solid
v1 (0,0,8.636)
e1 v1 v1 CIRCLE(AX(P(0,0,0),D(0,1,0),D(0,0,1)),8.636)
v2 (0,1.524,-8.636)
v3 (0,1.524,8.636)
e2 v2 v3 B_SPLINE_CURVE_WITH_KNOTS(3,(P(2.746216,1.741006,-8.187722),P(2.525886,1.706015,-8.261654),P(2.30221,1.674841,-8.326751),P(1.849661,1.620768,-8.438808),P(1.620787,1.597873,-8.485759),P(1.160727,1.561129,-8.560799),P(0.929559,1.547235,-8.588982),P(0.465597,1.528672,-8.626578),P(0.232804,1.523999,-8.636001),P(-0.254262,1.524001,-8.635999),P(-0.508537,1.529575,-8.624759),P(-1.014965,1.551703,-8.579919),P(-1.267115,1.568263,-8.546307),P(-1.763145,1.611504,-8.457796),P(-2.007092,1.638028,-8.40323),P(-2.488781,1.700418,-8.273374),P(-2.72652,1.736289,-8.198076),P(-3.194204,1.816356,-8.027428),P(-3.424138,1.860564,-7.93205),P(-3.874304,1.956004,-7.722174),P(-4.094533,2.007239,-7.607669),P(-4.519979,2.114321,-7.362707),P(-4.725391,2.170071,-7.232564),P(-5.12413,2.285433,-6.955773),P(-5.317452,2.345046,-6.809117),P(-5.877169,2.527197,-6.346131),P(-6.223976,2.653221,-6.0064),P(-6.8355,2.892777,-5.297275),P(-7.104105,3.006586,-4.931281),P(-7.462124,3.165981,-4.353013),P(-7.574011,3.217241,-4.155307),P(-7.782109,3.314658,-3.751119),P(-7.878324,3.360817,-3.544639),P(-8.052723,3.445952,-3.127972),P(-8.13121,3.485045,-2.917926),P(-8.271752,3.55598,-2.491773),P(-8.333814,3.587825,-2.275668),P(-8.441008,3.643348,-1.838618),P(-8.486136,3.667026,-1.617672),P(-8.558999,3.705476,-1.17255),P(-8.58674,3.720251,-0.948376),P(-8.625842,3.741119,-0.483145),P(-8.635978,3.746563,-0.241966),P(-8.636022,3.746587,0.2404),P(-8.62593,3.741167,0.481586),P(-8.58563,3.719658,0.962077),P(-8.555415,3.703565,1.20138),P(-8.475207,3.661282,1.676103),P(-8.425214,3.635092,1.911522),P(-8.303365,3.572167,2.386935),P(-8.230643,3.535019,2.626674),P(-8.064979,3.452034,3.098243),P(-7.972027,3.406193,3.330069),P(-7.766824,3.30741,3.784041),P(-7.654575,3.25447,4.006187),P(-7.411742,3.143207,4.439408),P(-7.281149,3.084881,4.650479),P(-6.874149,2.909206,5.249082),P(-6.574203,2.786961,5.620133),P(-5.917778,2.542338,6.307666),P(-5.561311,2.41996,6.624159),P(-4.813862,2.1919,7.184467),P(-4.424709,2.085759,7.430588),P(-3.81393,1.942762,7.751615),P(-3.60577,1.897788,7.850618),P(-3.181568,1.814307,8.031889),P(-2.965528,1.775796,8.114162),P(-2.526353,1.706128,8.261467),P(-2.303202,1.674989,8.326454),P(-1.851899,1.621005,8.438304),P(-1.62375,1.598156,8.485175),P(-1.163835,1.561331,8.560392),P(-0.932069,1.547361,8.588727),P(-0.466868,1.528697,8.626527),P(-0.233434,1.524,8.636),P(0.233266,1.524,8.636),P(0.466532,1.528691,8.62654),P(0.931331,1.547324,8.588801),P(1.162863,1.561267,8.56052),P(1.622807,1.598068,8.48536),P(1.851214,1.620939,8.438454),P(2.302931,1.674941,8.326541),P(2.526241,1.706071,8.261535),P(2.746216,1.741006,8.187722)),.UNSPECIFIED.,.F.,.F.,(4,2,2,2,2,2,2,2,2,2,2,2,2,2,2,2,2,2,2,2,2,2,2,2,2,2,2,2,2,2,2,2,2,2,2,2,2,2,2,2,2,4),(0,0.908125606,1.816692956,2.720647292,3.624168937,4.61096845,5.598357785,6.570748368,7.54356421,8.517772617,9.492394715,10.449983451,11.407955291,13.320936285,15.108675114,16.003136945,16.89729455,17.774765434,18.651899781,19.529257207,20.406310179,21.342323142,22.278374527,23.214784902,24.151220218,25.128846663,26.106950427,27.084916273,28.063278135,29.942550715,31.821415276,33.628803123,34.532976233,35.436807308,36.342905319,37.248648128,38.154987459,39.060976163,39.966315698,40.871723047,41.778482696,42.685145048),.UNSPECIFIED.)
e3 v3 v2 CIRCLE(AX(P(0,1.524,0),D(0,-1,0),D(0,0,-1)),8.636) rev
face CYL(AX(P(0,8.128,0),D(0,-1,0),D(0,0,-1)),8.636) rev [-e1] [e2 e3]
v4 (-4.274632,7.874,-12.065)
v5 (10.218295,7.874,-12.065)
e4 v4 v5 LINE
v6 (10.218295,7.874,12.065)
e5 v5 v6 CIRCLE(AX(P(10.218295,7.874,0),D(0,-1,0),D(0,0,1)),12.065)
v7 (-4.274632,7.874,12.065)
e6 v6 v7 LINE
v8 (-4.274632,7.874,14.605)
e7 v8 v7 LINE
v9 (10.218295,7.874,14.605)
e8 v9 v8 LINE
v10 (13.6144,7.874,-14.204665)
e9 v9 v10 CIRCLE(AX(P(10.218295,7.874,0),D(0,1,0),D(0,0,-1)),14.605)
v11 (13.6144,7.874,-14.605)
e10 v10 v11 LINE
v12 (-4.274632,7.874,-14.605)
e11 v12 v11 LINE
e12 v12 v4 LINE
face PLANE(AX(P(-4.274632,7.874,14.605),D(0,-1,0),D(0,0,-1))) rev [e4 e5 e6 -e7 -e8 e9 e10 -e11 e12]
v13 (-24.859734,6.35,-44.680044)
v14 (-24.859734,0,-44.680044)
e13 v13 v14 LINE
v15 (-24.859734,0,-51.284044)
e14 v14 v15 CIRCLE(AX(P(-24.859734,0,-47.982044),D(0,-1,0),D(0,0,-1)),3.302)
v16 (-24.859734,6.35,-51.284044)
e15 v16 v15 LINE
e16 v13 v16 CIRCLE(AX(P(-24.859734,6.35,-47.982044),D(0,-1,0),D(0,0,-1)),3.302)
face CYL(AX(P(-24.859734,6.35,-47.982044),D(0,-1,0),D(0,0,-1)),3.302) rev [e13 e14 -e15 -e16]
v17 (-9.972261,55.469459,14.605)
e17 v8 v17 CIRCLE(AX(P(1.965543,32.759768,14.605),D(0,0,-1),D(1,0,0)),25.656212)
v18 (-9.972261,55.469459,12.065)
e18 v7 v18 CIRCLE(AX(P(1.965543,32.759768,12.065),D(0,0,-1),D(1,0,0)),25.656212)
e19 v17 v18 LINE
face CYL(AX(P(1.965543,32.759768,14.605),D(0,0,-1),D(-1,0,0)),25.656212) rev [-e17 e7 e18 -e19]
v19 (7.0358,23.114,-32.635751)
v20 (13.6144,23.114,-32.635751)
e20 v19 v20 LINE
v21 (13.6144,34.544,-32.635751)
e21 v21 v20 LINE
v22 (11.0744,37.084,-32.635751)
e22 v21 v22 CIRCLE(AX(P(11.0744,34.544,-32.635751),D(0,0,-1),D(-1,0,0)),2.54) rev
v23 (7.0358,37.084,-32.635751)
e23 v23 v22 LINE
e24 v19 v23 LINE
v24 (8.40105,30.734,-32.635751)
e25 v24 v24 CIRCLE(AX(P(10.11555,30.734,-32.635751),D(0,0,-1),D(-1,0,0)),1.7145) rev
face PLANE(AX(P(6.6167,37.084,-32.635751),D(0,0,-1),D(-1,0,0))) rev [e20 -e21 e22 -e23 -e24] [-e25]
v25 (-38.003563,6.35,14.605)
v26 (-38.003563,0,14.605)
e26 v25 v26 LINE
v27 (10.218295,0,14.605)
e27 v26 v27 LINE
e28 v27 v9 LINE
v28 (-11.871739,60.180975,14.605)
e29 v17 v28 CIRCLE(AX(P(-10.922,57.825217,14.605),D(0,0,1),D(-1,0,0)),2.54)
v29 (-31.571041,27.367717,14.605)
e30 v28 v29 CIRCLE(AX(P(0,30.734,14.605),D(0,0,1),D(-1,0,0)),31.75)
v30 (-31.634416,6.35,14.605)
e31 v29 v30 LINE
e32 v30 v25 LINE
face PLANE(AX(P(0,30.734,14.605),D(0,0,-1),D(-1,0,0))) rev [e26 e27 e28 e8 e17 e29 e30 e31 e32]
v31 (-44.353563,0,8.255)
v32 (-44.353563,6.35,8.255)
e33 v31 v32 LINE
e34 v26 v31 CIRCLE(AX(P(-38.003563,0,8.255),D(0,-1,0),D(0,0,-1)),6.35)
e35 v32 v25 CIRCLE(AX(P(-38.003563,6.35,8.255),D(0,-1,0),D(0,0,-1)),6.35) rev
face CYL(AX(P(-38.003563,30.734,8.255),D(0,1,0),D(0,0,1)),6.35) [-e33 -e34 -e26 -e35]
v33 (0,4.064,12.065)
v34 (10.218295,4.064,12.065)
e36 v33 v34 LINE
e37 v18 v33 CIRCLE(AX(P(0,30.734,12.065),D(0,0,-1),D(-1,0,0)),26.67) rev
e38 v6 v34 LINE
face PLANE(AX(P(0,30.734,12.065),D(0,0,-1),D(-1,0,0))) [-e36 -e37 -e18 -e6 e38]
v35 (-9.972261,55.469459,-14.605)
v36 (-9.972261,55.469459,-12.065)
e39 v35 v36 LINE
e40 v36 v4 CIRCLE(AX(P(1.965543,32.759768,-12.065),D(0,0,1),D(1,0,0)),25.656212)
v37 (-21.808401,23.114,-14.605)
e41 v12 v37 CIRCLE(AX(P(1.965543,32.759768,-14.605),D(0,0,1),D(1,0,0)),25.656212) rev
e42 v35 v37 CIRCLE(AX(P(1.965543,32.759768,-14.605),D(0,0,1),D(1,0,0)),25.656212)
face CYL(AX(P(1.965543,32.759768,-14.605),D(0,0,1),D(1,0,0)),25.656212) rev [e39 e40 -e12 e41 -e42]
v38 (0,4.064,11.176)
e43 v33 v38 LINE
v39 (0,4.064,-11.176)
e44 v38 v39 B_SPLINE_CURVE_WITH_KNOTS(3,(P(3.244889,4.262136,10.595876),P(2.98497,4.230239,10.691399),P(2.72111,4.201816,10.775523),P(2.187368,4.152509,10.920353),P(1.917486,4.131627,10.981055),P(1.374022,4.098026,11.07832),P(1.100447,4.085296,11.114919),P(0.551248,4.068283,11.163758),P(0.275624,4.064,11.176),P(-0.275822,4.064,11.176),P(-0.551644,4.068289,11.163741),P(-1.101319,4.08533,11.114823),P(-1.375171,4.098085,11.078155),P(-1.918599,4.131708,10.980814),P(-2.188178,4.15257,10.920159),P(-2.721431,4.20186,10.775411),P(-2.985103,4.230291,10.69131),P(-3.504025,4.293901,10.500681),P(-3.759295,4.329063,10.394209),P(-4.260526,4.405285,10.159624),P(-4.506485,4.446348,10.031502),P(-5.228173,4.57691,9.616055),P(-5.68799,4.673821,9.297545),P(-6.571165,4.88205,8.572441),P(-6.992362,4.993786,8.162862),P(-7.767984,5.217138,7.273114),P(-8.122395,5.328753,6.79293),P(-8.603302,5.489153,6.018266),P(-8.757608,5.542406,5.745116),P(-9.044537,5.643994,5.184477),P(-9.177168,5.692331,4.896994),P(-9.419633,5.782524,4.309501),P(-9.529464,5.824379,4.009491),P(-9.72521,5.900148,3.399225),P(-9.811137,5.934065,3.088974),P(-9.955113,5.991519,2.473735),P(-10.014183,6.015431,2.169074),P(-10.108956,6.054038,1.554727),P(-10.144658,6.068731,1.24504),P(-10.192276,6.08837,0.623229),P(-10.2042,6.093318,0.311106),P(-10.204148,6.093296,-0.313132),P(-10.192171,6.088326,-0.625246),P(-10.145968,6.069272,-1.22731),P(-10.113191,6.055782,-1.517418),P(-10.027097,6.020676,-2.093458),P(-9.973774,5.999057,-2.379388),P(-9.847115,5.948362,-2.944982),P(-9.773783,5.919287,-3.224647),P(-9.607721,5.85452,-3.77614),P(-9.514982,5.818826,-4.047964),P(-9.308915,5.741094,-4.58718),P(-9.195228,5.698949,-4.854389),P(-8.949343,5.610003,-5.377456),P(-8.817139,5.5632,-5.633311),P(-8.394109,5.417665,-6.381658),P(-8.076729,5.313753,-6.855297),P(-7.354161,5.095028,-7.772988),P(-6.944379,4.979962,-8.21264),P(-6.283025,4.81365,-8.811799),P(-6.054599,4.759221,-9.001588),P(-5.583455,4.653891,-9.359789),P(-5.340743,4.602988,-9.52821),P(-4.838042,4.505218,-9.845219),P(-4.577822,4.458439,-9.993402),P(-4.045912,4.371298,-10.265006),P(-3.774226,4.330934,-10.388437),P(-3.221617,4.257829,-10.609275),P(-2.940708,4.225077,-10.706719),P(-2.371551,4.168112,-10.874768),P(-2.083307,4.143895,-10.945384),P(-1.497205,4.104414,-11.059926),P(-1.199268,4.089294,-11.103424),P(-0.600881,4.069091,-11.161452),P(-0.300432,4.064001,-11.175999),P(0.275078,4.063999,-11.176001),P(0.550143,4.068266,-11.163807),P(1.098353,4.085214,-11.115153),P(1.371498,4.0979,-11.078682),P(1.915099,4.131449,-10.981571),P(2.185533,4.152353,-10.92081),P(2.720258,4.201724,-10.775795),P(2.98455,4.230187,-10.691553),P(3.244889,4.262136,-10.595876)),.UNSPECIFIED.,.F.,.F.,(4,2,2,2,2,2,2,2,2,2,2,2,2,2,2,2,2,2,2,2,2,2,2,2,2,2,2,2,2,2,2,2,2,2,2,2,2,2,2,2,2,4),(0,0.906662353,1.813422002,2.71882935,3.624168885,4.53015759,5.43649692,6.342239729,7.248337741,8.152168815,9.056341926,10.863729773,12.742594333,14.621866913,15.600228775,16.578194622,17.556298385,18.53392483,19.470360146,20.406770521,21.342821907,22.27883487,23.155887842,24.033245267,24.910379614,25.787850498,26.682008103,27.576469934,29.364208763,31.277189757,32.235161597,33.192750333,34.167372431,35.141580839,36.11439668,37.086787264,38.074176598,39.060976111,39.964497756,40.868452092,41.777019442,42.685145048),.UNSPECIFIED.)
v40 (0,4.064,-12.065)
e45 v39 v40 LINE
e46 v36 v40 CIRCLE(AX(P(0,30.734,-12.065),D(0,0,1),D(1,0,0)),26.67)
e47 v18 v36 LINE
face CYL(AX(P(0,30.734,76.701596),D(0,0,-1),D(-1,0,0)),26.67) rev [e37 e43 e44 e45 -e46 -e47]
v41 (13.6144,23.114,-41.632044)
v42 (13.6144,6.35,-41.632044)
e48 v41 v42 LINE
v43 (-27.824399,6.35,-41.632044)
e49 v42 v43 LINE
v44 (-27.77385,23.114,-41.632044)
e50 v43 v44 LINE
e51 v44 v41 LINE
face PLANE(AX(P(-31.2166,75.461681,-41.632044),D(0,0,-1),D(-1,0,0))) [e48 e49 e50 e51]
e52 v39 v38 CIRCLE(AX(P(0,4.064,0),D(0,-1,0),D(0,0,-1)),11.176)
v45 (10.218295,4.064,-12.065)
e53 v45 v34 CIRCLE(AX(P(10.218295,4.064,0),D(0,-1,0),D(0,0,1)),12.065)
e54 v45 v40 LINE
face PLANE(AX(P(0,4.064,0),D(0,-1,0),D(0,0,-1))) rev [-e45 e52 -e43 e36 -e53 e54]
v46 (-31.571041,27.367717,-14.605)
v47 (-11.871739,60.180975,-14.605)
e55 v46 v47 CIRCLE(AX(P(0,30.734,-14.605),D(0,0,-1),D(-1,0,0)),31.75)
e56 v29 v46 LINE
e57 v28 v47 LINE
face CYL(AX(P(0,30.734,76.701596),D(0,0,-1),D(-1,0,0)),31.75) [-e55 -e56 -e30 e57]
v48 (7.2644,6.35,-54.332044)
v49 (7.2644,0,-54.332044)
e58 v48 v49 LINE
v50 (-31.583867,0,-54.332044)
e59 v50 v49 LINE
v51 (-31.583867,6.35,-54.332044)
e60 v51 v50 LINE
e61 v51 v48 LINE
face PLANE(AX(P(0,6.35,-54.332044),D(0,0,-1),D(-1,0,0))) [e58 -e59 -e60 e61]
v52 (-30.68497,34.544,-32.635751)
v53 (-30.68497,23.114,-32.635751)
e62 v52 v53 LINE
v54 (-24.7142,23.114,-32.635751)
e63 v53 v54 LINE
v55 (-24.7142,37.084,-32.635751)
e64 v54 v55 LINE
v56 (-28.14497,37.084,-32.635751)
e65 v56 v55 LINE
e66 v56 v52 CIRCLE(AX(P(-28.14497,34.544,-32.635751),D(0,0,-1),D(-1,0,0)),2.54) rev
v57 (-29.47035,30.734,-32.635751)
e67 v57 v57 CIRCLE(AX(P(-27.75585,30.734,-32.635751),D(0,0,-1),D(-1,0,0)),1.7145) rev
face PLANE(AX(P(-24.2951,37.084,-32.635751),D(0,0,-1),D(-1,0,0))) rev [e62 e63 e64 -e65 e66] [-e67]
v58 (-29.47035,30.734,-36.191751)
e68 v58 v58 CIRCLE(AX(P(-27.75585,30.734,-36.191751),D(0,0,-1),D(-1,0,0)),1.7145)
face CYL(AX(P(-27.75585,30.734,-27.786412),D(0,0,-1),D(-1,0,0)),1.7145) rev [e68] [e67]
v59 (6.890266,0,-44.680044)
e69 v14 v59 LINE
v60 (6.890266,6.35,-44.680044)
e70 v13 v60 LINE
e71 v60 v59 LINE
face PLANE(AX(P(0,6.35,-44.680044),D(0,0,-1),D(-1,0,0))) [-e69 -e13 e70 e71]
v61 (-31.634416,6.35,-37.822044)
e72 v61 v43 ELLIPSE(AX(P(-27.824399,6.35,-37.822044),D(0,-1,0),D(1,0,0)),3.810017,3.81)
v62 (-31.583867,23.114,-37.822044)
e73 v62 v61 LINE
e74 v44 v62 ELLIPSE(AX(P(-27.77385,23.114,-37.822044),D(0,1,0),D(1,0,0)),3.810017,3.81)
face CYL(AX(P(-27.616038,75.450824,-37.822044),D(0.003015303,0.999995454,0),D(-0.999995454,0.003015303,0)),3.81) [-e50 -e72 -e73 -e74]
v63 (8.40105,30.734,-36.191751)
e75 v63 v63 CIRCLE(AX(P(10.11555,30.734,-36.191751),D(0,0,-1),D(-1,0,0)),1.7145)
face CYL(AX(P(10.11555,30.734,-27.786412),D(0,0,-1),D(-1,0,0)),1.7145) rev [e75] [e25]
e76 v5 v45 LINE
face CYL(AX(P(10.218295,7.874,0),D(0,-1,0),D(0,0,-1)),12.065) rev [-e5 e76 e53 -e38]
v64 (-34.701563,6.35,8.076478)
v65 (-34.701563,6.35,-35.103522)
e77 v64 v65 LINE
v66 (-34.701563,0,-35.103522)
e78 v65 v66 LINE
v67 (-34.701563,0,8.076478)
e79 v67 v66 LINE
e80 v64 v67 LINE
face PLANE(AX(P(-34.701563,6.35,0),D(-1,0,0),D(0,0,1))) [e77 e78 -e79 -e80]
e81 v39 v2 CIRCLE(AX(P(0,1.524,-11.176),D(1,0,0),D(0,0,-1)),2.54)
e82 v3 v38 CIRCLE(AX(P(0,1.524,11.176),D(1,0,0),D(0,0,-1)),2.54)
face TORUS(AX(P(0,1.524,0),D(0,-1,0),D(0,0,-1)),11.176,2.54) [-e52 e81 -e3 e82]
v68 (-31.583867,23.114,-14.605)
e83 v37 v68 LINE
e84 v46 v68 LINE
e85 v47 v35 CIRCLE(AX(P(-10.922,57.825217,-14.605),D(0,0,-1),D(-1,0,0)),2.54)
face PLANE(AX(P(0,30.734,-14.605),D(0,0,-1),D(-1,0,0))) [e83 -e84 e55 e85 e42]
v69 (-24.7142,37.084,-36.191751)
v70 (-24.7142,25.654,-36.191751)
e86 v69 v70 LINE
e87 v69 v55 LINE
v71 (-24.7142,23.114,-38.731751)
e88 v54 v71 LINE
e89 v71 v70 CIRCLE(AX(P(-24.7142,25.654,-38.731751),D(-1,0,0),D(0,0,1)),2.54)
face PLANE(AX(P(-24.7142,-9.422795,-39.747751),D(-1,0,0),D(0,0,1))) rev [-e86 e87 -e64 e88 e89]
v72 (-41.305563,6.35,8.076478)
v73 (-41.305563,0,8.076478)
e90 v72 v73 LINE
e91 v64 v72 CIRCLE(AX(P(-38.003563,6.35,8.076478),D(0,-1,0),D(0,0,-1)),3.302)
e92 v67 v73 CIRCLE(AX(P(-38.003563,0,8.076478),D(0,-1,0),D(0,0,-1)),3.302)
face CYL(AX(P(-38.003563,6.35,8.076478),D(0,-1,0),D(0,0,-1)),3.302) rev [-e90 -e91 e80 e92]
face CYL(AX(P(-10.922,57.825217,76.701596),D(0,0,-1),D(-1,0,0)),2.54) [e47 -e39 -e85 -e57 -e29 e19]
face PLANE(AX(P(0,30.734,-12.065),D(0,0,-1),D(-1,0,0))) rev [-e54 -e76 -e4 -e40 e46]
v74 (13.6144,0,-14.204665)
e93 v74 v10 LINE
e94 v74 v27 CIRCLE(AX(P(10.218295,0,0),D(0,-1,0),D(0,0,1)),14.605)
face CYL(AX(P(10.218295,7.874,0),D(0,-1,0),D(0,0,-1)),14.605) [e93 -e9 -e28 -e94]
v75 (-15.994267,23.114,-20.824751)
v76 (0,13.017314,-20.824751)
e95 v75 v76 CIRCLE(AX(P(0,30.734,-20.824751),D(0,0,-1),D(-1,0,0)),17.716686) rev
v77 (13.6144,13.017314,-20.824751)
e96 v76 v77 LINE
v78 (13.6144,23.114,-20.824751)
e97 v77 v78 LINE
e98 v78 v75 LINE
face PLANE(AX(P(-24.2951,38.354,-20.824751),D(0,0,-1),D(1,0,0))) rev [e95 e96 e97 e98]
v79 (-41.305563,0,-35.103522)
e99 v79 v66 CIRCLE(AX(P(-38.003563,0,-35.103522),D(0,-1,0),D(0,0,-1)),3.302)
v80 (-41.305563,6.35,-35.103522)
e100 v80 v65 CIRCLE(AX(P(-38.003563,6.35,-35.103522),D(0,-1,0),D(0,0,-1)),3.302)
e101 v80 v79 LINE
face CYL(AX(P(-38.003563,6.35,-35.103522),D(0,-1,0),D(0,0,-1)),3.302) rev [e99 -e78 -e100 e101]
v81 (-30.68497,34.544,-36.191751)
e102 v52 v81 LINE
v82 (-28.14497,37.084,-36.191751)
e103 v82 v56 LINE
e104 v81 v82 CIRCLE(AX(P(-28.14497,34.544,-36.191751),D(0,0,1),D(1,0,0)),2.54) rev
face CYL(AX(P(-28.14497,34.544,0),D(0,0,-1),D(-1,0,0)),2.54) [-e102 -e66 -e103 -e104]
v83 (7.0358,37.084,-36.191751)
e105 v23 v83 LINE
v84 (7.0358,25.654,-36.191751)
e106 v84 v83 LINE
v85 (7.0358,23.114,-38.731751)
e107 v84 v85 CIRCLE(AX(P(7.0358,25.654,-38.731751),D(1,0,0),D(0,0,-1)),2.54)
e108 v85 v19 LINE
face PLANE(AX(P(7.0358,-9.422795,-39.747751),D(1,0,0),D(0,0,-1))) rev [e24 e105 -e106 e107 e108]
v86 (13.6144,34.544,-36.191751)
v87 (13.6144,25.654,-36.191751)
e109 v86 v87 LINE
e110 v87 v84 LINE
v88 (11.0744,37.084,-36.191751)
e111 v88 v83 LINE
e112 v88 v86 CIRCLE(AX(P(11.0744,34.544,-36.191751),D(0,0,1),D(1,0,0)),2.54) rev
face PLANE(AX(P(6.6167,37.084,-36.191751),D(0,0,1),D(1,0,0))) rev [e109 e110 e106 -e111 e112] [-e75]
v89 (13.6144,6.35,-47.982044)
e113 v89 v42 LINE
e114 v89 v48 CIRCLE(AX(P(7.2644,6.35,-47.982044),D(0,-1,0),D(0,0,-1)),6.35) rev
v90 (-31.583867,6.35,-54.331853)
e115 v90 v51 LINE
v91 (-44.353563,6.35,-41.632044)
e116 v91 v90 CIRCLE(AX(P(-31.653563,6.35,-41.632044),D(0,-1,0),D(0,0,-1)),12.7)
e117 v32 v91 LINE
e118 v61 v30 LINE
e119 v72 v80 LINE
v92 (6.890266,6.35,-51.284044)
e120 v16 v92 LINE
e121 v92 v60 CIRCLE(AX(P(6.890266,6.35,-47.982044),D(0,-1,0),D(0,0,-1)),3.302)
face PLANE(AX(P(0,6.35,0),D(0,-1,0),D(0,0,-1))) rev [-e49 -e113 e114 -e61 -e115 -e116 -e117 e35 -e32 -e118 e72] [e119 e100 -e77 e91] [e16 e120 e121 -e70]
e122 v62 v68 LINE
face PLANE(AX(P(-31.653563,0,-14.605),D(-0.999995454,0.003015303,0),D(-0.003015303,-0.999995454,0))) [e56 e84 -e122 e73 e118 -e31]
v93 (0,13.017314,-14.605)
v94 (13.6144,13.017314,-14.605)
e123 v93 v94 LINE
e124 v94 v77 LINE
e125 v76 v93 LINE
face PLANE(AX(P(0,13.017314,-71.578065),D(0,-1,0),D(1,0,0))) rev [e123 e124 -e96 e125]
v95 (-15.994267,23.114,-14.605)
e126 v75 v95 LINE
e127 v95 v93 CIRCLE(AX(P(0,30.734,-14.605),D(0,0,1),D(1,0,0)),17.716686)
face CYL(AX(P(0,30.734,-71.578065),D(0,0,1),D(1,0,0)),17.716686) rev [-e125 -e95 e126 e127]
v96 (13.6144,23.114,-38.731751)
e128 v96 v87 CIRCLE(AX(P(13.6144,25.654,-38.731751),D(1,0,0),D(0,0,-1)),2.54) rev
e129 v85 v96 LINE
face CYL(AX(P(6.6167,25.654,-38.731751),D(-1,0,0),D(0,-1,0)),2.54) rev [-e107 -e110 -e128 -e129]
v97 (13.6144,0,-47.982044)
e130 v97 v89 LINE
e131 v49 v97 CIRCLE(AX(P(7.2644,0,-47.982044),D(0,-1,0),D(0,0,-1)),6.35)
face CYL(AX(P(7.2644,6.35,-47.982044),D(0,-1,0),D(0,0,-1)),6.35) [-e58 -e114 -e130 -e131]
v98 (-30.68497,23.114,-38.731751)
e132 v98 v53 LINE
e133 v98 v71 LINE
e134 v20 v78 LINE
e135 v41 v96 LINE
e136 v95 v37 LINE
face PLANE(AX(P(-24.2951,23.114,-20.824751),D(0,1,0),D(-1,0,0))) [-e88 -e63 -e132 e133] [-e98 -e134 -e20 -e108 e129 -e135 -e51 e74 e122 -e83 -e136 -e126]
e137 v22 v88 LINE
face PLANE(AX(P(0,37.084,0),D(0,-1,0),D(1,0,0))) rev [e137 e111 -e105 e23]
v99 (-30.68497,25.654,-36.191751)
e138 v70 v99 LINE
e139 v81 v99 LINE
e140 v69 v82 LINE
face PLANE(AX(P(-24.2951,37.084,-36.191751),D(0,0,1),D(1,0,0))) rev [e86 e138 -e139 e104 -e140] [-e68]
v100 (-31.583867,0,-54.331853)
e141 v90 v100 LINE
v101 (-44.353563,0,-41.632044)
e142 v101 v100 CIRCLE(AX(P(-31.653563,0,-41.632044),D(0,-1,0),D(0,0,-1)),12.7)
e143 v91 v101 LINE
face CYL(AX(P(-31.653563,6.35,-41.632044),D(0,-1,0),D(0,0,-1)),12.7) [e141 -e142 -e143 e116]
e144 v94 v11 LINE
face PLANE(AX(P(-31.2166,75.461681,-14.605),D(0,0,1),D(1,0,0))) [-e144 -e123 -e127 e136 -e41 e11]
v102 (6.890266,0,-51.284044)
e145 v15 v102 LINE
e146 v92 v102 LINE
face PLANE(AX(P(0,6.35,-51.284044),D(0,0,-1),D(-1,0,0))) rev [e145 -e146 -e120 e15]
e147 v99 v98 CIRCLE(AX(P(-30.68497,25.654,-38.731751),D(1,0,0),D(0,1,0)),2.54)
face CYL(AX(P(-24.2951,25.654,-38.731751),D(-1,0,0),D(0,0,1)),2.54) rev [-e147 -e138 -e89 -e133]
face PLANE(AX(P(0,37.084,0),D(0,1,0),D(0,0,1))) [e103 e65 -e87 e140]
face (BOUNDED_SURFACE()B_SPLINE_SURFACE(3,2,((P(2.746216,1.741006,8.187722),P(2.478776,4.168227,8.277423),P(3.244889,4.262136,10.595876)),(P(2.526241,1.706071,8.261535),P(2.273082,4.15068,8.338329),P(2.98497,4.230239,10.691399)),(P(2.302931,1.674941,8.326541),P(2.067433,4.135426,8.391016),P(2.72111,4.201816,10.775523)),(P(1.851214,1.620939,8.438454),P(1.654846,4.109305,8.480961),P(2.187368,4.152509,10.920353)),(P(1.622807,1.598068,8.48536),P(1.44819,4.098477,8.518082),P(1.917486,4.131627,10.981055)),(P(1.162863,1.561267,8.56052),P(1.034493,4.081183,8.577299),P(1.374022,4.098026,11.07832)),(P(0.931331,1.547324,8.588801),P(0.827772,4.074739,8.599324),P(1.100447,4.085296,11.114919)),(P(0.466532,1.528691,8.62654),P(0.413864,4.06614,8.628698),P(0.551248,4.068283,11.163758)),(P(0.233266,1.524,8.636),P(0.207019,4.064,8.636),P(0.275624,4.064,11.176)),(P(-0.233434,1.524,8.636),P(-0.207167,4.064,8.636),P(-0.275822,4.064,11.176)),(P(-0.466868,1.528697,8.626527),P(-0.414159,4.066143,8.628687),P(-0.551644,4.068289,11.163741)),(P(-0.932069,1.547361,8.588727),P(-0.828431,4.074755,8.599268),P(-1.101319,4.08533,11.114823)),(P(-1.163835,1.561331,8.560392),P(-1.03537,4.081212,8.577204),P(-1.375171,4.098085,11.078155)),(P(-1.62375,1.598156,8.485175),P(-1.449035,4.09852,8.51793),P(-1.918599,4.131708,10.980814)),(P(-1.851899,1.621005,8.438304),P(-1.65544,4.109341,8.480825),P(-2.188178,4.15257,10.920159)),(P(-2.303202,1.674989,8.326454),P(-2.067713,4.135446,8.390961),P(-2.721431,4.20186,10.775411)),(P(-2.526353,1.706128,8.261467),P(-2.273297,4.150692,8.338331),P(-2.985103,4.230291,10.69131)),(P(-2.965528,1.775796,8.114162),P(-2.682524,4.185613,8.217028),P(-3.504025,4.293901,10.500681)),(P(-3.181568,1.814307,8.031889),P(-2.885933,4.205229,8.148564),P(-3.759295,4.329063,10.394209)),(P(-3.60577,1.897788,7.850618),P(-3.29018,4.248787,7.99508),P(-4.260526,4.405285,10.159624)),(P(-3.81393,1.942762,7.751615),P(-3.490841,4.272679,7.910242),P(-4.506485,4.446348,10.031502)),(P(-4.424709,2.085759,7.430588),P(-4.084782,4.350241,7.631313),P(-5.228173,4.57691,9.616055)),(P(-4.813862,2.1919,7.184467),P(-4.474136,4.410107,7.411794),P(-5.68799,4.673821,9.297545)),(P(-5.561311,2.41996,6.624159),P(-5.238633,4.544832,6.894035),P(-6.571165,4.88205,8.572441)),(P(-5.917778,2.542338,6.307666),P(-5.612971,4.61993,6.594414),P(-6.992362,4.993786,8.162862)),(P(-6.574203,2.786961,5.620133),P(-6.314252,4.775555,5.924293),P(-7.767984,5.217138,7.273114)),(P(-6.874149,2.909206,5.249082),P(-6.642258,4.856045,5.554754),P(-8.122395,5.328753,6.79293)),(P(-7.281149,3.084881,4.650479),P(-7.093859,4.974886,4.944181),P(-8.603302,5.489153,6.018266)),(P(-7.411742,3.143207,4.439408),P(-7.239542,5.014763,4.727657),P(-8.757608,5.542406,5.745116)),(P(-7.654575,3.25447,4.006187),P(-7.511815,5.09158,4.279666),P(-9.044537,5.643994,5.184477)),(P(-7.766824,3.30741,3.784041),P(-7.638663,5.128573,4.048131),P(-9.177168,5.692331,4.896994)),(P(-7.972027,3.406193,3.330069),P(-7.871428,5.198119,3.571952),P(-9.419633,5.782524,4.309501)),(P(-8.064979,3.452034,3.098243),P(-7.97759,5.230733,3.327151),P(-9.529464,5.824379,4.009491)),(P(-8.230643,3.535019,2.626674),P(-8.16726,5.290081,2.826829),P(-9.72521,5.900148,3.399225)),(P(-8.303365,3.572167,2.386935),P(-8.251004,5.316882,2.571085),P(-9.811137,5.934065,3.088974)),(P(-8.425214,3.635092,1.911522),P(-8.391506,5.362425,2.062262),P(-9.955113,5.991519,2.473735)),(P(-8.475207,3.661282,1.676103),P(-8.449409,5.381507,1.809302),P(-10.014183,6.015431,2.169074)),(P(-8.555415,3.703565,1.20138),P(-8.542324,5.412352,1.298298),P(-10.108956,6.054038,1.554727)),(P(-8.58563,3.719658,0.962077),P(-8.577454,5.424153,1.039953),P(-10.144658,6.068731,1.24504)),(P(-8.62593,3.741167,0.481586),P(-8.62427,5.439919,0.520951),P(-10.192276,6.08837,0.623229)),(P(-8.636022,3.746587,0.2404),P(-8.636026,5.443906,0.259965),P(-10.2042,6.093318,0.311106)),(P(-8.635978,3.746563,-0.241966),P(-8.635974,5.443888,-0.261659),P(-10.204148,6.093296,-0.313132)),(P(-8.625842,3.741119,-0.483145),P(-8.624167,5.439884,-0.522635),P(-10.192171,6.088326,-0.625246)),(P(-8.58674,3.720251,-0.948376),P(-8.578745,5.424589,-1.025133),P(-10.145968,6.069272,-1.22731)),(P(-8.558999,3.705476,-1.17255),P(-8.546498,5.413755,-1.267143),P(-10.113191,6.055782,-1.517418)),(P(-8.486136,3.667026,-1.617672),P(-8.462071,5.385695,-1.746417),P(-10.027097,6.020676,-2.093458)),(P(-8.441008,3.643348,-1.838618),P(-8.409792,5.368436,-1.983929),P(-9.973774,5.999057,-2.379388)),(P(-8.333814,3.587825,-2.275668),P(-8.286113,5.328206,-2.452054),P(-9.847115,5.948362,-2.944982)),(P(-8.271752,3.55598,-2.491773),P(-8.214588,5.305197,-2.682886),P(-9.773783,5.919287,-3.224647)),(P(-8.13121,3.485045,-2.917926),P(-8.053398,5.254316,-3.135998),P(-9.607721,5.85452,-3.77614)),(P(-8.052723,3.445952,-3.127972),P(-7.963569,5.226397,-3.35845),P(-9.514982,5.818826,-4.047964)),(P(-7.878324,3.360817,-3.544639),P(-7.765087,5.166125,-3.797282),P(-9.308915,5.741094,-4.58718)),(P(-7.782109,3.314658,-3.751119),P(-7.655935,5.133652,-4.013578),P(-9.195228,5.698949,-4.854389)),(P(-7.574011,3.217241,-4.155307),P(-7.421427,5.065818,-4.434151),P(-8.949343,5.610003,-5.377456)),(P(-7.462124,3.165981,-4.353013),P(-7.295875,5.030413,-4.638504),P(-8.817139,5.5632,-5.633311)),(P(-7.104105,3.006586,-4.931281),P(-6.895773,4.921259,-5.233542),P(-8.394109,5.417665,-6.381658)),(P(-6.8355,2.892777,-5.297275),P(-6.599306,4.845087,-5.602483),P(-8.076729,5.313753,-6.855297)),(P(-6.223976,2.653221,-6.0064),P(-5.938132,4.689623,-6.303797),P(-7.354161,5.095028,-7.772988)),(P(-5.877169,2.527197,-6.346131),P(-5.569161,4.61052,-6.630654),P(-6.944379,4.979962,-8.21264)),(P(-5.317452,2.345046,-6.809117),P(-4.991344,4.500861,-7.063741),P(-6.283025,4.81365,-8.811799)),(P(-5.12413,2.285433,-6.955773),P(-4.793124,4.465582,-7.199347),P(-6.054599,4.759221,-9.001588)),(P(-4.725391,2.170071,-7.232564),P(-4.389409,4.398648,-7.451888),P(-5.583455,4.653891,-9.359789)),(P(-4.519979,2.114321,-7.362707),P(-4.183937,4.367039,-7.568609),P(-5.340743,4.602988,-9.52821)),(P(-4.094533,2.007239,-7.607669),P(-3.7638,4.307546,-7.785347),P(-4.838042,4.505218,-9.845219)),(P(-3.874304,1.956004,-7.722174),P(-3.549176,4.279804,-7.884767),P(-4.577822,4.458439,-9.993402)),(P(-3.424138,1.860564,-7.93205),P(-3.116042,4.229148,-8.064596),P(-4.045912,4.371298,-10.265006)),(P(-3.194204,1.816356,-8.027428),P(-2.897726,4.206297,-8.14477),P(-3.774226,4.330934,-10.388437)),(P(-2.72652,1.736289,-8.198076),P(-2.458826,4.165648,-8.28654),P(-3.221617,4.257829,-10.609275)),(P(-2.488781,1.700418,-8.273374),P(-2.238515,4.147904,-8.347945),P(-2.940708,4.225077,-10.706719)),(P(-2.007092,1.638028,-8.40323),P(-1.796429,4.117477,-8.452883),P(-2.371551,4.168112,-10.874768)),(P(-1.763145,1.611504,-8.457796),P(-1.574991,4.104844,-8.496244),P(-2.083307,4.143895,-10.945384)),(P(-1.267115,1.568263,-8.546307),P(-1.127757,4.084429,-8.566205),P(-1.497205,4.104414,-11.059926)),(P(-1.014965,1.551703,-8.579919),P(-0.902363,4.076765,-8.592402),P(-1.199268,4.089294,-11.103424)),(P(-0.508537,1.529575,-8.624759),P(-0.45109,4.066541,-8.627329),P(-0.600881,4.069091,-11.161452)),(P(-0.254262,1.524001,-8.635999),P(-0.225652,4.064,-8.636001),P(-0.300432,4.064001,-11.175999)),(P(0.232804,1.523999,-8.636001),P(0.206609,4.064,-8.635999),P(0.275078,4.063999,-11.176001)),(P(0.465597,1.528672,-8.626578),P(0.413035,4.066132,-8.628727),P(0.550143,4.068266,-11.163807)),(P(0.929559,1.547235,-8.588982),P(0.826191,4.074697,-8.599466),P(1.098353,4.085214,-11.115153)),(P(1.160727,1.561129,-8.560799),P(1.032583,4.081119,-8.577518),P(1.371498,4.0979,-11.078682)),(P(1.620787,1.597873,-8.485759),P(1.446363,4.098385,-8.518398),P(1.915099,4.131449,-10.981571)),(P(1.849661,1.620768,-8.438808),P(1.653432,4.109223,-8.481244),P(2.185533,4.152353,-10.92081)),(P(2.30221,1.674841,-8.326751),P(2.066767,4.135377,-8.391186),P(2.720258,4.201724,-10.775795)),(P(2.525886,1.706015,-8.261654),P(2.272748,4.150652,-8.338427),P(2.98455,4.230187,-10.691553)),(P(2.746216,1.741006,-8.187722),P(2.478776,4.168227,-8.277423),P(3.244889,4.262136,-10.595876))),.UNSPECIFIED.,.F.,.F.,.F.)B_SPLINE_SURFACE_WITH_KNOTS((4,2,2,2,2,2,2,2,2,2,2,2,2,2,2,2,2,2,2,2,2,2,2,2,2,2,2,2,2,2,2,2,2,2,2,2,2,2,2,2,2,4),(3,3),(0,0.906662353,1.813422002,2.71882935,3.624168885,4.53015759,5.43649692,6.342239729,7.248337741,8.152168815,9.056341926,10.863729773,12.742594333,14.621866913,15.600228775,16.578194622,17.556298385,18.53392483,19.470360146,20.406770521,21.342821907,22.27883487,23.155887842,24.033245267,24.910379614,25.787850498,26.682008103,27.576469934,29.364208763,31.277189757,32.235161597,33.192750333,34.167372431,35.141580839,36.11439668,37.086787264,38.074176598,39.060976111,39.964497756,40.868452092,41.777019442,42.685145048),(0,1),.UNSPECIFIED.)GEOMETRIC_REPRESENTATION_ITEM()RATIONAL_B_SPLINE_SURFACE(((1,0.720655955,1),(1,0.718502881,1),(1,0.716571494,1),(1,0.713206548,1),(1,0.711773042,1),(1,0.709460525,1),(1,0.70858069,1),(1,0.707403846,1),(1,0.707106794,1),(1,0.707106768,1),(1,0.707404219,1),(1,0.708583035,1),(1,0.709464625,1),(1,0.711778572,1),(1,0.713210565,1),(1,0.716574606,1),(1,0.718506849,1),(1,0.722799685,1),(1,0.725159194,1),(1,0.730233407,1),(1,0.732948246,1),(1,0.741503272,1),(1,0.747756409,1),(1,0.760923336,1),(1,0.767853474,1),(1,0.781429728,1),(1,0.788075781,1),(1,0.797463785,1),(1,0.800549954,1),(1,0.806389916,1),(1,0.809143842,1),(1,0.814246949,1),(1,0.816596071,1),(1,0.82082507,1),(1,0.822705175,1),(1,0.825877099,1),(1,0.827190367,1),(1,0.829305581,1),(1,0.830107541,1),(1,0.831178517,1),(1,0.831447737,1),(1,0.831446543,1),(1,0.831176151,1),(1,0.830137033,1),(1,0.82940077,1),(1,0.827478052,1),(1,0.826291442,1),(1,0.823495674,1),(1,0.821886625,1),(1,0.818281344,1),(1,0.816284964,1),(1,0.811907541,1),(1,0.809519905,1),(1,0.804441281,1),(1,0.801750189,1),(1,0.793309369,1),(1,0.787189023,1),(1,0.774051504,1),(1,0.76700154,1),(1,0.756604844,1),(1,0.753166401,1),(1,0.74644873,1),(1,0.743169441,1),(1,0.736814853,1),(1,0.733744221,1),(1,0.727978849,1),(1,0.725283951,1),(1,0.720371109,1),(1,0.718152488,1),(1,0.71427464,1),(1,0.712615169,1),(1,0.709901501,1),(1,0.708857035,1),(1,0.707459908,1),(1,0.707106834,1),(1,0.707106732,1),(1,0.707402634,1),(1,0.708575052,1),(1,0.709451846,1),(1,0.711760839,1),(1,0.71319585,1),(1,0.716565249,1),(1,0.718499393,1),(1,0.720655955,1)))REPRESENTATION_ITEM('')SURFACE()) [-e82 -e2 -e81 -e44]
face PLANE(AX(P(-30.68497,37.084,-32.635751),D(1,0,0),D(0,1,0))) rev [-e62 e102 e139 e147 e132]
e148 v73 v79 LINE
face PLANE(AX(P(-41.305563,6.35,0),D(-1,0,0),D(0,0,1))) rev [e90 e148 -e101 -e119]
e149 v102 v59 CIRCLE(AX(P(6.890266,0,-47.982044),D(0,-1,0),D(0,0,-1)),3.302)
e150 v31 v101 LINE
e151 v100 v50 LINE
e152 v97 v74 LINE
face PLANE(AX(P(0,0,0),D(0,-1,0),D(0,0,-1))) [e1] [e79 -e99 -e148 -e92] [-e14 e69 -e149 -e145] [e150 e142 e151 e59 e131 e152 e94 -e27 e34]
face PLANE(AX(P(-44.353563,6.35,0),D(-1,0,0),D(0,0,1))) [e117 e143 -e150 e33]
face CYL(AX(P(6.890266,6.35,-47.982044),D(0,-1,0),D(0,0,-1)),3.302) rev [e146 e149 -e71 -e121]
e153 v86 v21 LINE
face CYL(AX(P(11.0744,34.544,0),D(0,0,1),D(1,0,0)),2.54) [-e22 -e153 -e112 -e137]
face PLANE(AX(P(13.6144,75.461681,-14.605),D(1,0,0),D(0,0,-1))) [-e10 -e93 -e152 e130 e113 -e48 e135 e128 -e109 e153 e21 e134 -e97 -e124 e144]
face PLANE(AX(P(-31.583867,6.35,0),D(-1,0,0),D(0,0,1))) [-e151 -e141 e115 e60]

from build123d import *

# Parameters (mm, degrees)
SKETCH1_W                       = 63.5
SKETCH1_H                       = 24.13
BOSS_EXTRUDE1_DEPTH             = 4.064
BOSS_EXTRUDE2_REACH             = 36.207
BOSS_EXTRUDE2_DIRECTION_2_REACH = 36.207
CUT_EXTRUDE1_DEPTH              = 4.064
CUT_EXTRUDE1_DEPTH_BACK         = 66.752974943
SKETCH4_R                       = 8.636
FILLET1_R                       = 2.54
CUT_EXTRUDE2_DEPTH              = 73.348315655
BOSS_EXTRUDE3_DEPTH             = 2.54
BOSS_EXTRUDE4_START             = 2.54
BOSS_EXTRUDE4_DEPTH             = 2.54
BOSS_EXTRUDE5_DEPTH             = 3.81
CUT_EXTRUDE3_DEPTH              = 64.061052508
BOSS_EXTRUDE6_START             = -23.114
SKETCH12_W                      = 44.831
SKETCH12_H                      = 27.027043781
BOSS_EXTRUDE6_DEPTH             = 23.114
BOSS_EXTRUDE7_DEPTH             = 7.874
CUT_EXTRUDE4_START              = -6.219751
CUT_EXTRUDE4_DEPTH              = 6.219751
CUT_EXTRUDE5_DEPTH              = 27.027043781
SKETCH17_W                      = 6.9977
SKETCH17_H                      = 3.556
BOSS_EXTRUDE8_DEPTH             = 13.97
SKETCH18_W                      = 6.389869694
SKETCH18_H                      = 3.556
BOSS_EXTRUDE9_DEPTH             = 13.97
SKETCH19_W                      = 31.75
SKETCH19_H                      = 7.112
CUT_EXTRUDE6_DEPTH              = 13.97
CUT_EXTRUDE7_REACH              = 87.043
SKETCH20_R                      = 1.7145
FILLET2_R                       = 2.54
FILLET3_R                       = 2.54
FILLET4_R                       = 2.54
BOSS_EXTRUDE10_DEPTH            = 29.21
BOSS_EXTRUDE11_DEPTH            = 27.027043781
BOSS_EXTRUDE16_DEPTH            = 6.35
FILLET5_R                       = 6.35
FILLET6_R                       = 3.81


with BuildPart() as part:
    # Sketch1 → Boss-Extrude1 (new body)
    with BuildSketch(Plane(origin=(0, 0, 0), x_dir=(1, 0, 0), z_dir=(0, 1, 0))):
        Rectangle(SKETCH1_W, SKETCH1_H)
    extrude(amount=BOSS_EXTRUDE1_DEPTH)

    # Boss-Extrude2: up to this face of the body (flat: up to its plane)
    boss_extrude2_end = Plane(part.part.faces().sort_by_distance((0, 2.032, 12.065))[0])
    # Sketch2 → Boss-Extrude2 (add, up to the picked face)
    with BuildSketch(Plane.XY, mode=Mode.PRIVATE) as boss_extrude2_sk1:
        with BuildLine():
            Line((0, 4.064), (-26.716755185, 4.064))
            Line((-26.716755185, 4.064), (-31.571041118, 27.367716778))
            ThreePointArc((-31.571041118, 27.367716778), (-27.221246487, 47.076161415), (-11.87173913, 60.180974548))
            ThreePointArc((-11.87173913, 60.180974548), (-8.566242036, 58.774955714), (-9.97226087, 55.46945862))
            ThreePointArc((-9.97226087, 55.46945862), (-26.181898149, 25.654914521), (0, 4.064))
        make_face()
    boss_extrude2_tool1 = split(extrude(boss_extrude2_sk1.sketch, amount=BOSS_EXTRUDE2_REACH, mode=Mode.PRIVATE), bisect_by=boss_extrude2_end, keep=Keep.BOTH, mode=Mode.PRIVATE)
    add(boss_extrude2_tool1.solids().sort_by(Axis((-9.165723, 58.533271, 0), (0, 0, 1)))[0])

    # Boss-Extrude2 direction 2: up to this face of the body (flat: up to its plane)
    boss_extrude2_direction_2_end = Plane(part.part.faces().sort_by_distance((0, 2.032, -12.065))[0])
    # Sketch2 → Boss-Extrude2 direction 2 (add, up to the picked face)
    with BuildSketch(Plane.XY, mode=Mode.PRIVATE) as boss_extrude2_direction_2_sk1:
        with BuildLine():
            Line((0, 4.064), (-26.716755185, 4.064))
            Line((-26.716755185, 4.064), (-31.571041118, 27.367716778))
            ThreePointArc((-31.571041118, 27.367716778), (-27.221246487, 47.076161415), (-11.87173913, 60.180974548))
            ThreePointArc((-11.87173913, 60.180974548), (-8.566242036, 58.774955714), (-9.97226087, 55.46945862))
            ThreePointArc((-9.97226087, 55.46945862), (-26.181898149, 25.654914521), (0, 4.064))
        make_face()
    boss_extrude2_direction_2_tool1 = split(extrude(boss_extrude2_direction_2_sk1.sketch, amount=-BOSS_EXTRUDE2_DIRECTION_2_REACH, mode=Mode.PRIVATE), bisect_by=boss_extrude2_direction_2_end, keep=Keep.BOTH, mode=Mode.PRIVATE)
    add(boss_extrude2_direction_2_tool1.solids().sort_by(Axis((-9.165723, 58.533271, 0), (0, 0, -1)))[0])

    # Sketch4 → Cut-Extrude1 (cut, two sides: drawn at the far end of the back side and taken through both)
    with BuildSketch(Plane(origin=(0, 4.064, 0), x_dir=(1, 0, 0), z_dir=(0, 1, 0)).offset(-CUT_EXTRUDE1_DEPTH_BACK)):
        with Locations(Location((0, 0, 0), (0, 0, 270))):
            Circle(SKETCH4_R)
    extrude(amount=CUT_EXTRUDE1_DEPTH + CUT_EXTRUDE1_DEPTH_BACK, mode=Mode.SUBTRACT)

    # Fillet1
    fillet1_edges = [part.edges().sort_by_distance(p)[0] for p in [
        (-8.636, 5.50091846, 0),
        (8.636, 4.064, 0),
    ]]
    fillet(fillet1_edges, radius=FILLET1_R)

    # Sketch6 → Cut-Extrude2 (cut, through all)
    with BuildSketch(Plane.XY.offset(12.065)):
        Polygon((-31.75, 4.064), (-26.716755185, 4.064), (-25.870202757, 0), (-31.75, 0), align=None)
    extrude(amount=-CUT_EXTRUDE2_DEPTH, mode=Mode.SUBTRACT)

    # Sketch8 → Boss-Extrude3 (add)
    with BuildSketch(Plane.XY.offset(12.065)):
        with BuildLine():
            Line((31.75, 0), (31.75, 7.874))
            Line((31.75, 7.874), (-4.274632474, 7.874))
            ThreePointArc((-4.274632474, 7.874), (-23.508790492, 29.710248048), (-9.97226087, 55.46945862))
            ThreePointArc((-9.97226087, 55.46945862), (-8.566242036, 58.774955714), (-11.87173913, 60.180974548))
            ThreePointArc((-11.87173913, 60.180974548), (-27.221246487, 47.076161415), (-31.571041118, 27.367716778))
            Line((-31.571041118, 27.367716778), (-25.870202757, 0))
            Line((-25.870202757, 0), (31.75, 0))
        make_face()
    extrude(amount=BOSS_EXTRUDE3_DEPTH)

    # Sketch9 → Boss-Extrude4 (add)
    with BuildSketch(Plane(origin=(0, 0, -12.065), x_dir=(-1, 0, 0), z_dir=(0, 0, -1)).offset(BOSS_EXTRUDE4_START)):
        with BuildLine():
            Line((-31.75, 0), (-31.75, 7.874))
            Line((-31.75, 7.874), (4.274632474, 7.874))
            ThreePointArc((4.274632474, 7.874), (23.508790492, 29.710248048), (9.97226087, 55.46945862))
            ThreePointArc((9.97226087, 55.46945862), (8.566242036, 58.774955714), (11.87173913, 60.180974548))
            ThreePointArc((11.87173913, 60.180974548), (27.221246487, 47.076161415), (31.571041118, 27.367716778))
            Line((31.571041118, 27.367716778), (25.870202757, 0))
            Line((25.870202757, 0), (-31.75, 0))
        make_face()
    extrude(amount=-BOSS_EXTRUDE4_DEPTH)

    # Sketch10 → Boss-Extrude5 (add)
    with BuildSketch(Plane(origin=(0, 4.064, 0), x_dir=(1, 0, 0), z_dir=(0, 1, 0))):
        with BuildLine():
            Line((10.218295125, 14.605), (10.218295125, 12.065))
            ThreePointArc((10.218295125, 12.065), (22.283295125, 0), (10.218295125, -12.065))
            Line((10.218295125, -12.065), (10.218295125, -14.605))
            ThreePointArc((10.218295125, -14.605), (24.823295125, 0), (10.218295125, 14.605))
        make_face()
    extrude(amount=BOSS_EXTRUDE5_DEPTH)

    # Sketch11 → Cut-Extrude3 (cut, through all)
    with BuildSketch(Plane(origin=(0, 7.874, 0), x_dir=(1, 0, 0), z_dir=(0, 1, 0))):
        with BuildLine():
            Line((10.218295125, 14.605), (31.75, 14.605))
            Line((31.75, 14.605), (31.75, -14.605))
            Line((31.75, -14.605), (10.218295125, -14.605))
            ThreePointArc((10.218295125, -14.605), (24.823295125, 0), (10.218295125, 14.605))
        make_face()
    extrude(amount=-CUT_EXTRUDE3_DEPTH, mode=Mode.SUBTRACT)

    # Sketch12 → Boss-Extrude6 (add)
    with BuildSketch(Plane.XZ.offset(BOSS_EXTRUDE6_START)):
        with Locations((-8.8011, -28.11852189)):
            Rectangle(SKETCH12_W, SKETCH12_H)
    extrude(amount=BOSS_EXTRUDE6_DEPTH)

    # Sketch13 → Boss-Extrude7 (add)
    with BuildSketch(Plane.XZ):
        Polygon((10.218295125, -14.605), (13.6144, -14.605), (13.6144, -13.335525526), align=None)
    extrude(amount=-BOSS_EXTRUDE7_DEPTH)

    # Sketch14 → Cut-Extrude4 (cut)
    with BuildSketch(Plane.XY.offset(-14.605).offset(CUT_EXTRUDE4_START)):
        with BuildLine():
            Line((0, 13.017313502), (18.620278687, 13.017313502))
            Line((18.620278687, 13.017313502), (17.716686498, 30.734))
            ThreePointArc((17.716686498, 30.734), (-12.527589163, 43.261589163), (0, 13.017313502))
        make_face()
    extrude(amount=CUT_EXTRUDE4_DEPTH, mode=Mode.SUBTRACT)

    # Sketch16 → Cut-Extrude5 (cut)
    with BuildSketch(Plane.XY.offset(-14.605)):
        Polygon((-31.2166, 23.114), (-30.684969694, 23.114), (-25.870202757, 0), (-31.2166, 0), align=None)
    extrude(amount=-CUT_EXTRUDE5_DEPTH, mode=Mode.SUBTRACT)

    # Sketch17 → Boss-Extrude8 (add)
    with BuildSketch(Plane(origin=(0, 23.114, 0), x_dir=(1, 0, 0), z_dir=(0, 1, 0))):
        with Locations((10.11555, 34.413750632)):
            Rectangle(SKETCH17_W, SKETCH17_H)
    extrude(amount=BOSS_EXTRUDE8_DEPTH)

    # Sketch18 → Boss-Extrude9 (add)
    with BuildSketch(Plane(origin=(0, 23.114, 0), x_dir=(1, 0, 0), z_dir=(0, 1, 0))):
        with Locations((-27.490034847, 34.413750632)):
            Rectangle(SKETCH18_W, SKETCH18_H)
    extrude(amount=BOSS_EXTRUDE9_DEPTH)

    # Sketch19 → Cut-Extrude6 (cut)
    with BuildSketch(Plane(origin=(0, 37.084, 0), x_dir=(1, 0, 0), z_dir=(0, 1, 0))):
        with Locations((-8.8392, 36.191750632)):
            Rectangle(SKETCH19_W, SKETCH19_H)
    extrude(amount=-CUT_EXTRUDE6_DEPTH, mode=Mode.SUBTRACT)

    # Sketch20 → Cut-Extrude7 (cut, up to next)
    with BuildSketch(Plane(origin=(0, 0, -36.191750632), x_dir=(-1, 0, 0), z_dir=(0, 0, -1)), mode=Mode.PRIVATE) as cut_extrude7_sk1:
        with Locations((27.75585, 30.734)):
            Circle(SKETCH20_R)
    cut_extrude7_tool1 = extrude(cut_extrude7_sk1.sketch, amount=-CUT_EXTRUDE7_REACH, mode=Mode.PRIVATE) & part.part
    # Sketch20 → Cut-Extrude7 (cut, up to next)
    with BuildSketch(Plane(origin=(0, 0, -36.191750632), x_dir=(-1, 0, 0), z_dir=(0, 0, -1)), mode=Mode.PRIVATE) as cut_extrude7_sk2:
        with Locations((-10.11555, 30.734)):
            Circle(SKETCH20_R)
    cut_extrude7_tool2 = extrude(cut_extrude7_sk2.sketch, amount=-CUT_EXTRUDE7_REACH, mode=Mode.PRIVATE) & part.part
    add(cut_extrude7_tool1.solids().sort_by_distance((-27.75585, 30.734, -36.191751))[0], mode=Mode.SUBTRACT)
    add(cut_extrude7_tool2.solids().sort_by_distance((10.11555, 30.734, -36.191751))[0], mode=Mode.SUBTRACT)

    # Fillet2
    fillet2_edges = [part.edges().sort_by_distance(p)[0] for p in [
        (10.3251, 23.114, -36.191750632),
    ]]
    fillet(fillet2_edges, radius=FILLET2_R)

    # Fillet3
    fillet3_edges = [part.edges().sort_by_distance(p)[0] for p in [
        (-27.699584847, 23.114, -36.191750632),
    ]]
    fillet(fillet3_edges, radius=FILLET3_R)

    # Fillet4
    fillet4_edges = [part.edges().sort_by_distance(p)[0] for p in [
        (13.6144, 37.084, -34.413750632),
        (-30.684969694, 37.084, -34.413750632),
    ]]
    fillet(fillet4_edges, radius=FILLET4_R)

    # Sketch26 → Boss-Extrude10 (add)
    with BuildSketch(Plane.XY.offset(14.605)):
        Polygon((-25.870202757, 0), (-31.653563464, 0), (-31.571041118, 27.367716778), align=None)
    extrude(amount=-BOSS_EXTRUDE10_DEPTH)

    # Sketch22 → Boss-Extrude11 (add)
    with BuildSketch(Plane(origin=(0, 0, -14.605), x_dir=(-1, 0, 0), z_dir=(0, 0, -1))):
        Polygon((30.684969694, 23.114), (31.583867423, 23.114), (31.653563464, 0), (25.870202757, 0), align=None)
    extrude(amount=BOSS_EXTRUDE11_DEPTH)

    # Sketch23 → Boss-Extrude16 (add)
    with BuildSketch(Plane.XZ):
        with BuildLine():
            Line((-15.554631727, 14.605), (-44.353563464, 14.605))
            Line((-44.353563464, 14.605), (-44.353563464, -41.632043781))
            ThreePointArc((-44.353563464, -41.632043781), (-40.609144413, -50.636907459), (-31.583867423, -54.331852538))
            Line((-31.583867423, -54.331852538), (13.6144, -54.332043781))
            Line((13.6144, -54.332043781), (13.6144, -35.10352189))
            Line((13.6144, -35.10352189), (-15.554631727, -35.10352189))
            Line((-15.554631727, -35.10352189), (-15.554631727, 14.605))
        make_face()
        with BuildLine():
            Line((-34.701563464, 8.07647811), (-34.701563464, -35.10352189))
            ThreePointArc((-34.701563464, -35.10352189), (-38.003563464, -38.40552189), (-41.305563464, -35.10352189))
            Line((-41.305563464, -35.10352189), (-41.305563464, 8.07647811))
            ThreePointArc((-41.305563464, 8.07647811), (-38.003563464, 11.37847811), (-34.701563464, 8.07647811))
        make_face(mode=Mode.SUBTRACT)
        with BuildLine():
            Line((-24.859733712, -44.680043781), (6.890266288, -44.680043781))
            ThreePointArc((6.890266288, -44.680043781), (10.192266288, -47.982043781), (6.890266288, -51.284043781))
            Line((6.890266288, -51.284043781), (-24.859733712, -51.284043781))
            ThreePointArc((-24.859733712, -51.284043781), (-28.161733712, -47.982043781), (-24.859733712, -44.680043781))
        make_face(mode=Mode.SUBTRACT)
    extrude(amount=-BOSS_EXTRUDE16_DEPTH)

    # Fillet5
    fillet5_edges = [part.edges().sort_by_distance(p)[0] for p in [
        (13.6144, 3.175, -54.332043781),
        (-44.353563464, 3.175, 14.605),
    ]]
    fillet(fillet5_edges, radius=FILLET5_R)

    # Fillet6
    fillet6_edges = [part.edges().sort_by_distance(p)[0] for p in [
        (-31.609141812, 14.732, -41.632043781),
    ]]
    fillet(fillet6_edges, radius=FILLET6_R)


solid = part.part
